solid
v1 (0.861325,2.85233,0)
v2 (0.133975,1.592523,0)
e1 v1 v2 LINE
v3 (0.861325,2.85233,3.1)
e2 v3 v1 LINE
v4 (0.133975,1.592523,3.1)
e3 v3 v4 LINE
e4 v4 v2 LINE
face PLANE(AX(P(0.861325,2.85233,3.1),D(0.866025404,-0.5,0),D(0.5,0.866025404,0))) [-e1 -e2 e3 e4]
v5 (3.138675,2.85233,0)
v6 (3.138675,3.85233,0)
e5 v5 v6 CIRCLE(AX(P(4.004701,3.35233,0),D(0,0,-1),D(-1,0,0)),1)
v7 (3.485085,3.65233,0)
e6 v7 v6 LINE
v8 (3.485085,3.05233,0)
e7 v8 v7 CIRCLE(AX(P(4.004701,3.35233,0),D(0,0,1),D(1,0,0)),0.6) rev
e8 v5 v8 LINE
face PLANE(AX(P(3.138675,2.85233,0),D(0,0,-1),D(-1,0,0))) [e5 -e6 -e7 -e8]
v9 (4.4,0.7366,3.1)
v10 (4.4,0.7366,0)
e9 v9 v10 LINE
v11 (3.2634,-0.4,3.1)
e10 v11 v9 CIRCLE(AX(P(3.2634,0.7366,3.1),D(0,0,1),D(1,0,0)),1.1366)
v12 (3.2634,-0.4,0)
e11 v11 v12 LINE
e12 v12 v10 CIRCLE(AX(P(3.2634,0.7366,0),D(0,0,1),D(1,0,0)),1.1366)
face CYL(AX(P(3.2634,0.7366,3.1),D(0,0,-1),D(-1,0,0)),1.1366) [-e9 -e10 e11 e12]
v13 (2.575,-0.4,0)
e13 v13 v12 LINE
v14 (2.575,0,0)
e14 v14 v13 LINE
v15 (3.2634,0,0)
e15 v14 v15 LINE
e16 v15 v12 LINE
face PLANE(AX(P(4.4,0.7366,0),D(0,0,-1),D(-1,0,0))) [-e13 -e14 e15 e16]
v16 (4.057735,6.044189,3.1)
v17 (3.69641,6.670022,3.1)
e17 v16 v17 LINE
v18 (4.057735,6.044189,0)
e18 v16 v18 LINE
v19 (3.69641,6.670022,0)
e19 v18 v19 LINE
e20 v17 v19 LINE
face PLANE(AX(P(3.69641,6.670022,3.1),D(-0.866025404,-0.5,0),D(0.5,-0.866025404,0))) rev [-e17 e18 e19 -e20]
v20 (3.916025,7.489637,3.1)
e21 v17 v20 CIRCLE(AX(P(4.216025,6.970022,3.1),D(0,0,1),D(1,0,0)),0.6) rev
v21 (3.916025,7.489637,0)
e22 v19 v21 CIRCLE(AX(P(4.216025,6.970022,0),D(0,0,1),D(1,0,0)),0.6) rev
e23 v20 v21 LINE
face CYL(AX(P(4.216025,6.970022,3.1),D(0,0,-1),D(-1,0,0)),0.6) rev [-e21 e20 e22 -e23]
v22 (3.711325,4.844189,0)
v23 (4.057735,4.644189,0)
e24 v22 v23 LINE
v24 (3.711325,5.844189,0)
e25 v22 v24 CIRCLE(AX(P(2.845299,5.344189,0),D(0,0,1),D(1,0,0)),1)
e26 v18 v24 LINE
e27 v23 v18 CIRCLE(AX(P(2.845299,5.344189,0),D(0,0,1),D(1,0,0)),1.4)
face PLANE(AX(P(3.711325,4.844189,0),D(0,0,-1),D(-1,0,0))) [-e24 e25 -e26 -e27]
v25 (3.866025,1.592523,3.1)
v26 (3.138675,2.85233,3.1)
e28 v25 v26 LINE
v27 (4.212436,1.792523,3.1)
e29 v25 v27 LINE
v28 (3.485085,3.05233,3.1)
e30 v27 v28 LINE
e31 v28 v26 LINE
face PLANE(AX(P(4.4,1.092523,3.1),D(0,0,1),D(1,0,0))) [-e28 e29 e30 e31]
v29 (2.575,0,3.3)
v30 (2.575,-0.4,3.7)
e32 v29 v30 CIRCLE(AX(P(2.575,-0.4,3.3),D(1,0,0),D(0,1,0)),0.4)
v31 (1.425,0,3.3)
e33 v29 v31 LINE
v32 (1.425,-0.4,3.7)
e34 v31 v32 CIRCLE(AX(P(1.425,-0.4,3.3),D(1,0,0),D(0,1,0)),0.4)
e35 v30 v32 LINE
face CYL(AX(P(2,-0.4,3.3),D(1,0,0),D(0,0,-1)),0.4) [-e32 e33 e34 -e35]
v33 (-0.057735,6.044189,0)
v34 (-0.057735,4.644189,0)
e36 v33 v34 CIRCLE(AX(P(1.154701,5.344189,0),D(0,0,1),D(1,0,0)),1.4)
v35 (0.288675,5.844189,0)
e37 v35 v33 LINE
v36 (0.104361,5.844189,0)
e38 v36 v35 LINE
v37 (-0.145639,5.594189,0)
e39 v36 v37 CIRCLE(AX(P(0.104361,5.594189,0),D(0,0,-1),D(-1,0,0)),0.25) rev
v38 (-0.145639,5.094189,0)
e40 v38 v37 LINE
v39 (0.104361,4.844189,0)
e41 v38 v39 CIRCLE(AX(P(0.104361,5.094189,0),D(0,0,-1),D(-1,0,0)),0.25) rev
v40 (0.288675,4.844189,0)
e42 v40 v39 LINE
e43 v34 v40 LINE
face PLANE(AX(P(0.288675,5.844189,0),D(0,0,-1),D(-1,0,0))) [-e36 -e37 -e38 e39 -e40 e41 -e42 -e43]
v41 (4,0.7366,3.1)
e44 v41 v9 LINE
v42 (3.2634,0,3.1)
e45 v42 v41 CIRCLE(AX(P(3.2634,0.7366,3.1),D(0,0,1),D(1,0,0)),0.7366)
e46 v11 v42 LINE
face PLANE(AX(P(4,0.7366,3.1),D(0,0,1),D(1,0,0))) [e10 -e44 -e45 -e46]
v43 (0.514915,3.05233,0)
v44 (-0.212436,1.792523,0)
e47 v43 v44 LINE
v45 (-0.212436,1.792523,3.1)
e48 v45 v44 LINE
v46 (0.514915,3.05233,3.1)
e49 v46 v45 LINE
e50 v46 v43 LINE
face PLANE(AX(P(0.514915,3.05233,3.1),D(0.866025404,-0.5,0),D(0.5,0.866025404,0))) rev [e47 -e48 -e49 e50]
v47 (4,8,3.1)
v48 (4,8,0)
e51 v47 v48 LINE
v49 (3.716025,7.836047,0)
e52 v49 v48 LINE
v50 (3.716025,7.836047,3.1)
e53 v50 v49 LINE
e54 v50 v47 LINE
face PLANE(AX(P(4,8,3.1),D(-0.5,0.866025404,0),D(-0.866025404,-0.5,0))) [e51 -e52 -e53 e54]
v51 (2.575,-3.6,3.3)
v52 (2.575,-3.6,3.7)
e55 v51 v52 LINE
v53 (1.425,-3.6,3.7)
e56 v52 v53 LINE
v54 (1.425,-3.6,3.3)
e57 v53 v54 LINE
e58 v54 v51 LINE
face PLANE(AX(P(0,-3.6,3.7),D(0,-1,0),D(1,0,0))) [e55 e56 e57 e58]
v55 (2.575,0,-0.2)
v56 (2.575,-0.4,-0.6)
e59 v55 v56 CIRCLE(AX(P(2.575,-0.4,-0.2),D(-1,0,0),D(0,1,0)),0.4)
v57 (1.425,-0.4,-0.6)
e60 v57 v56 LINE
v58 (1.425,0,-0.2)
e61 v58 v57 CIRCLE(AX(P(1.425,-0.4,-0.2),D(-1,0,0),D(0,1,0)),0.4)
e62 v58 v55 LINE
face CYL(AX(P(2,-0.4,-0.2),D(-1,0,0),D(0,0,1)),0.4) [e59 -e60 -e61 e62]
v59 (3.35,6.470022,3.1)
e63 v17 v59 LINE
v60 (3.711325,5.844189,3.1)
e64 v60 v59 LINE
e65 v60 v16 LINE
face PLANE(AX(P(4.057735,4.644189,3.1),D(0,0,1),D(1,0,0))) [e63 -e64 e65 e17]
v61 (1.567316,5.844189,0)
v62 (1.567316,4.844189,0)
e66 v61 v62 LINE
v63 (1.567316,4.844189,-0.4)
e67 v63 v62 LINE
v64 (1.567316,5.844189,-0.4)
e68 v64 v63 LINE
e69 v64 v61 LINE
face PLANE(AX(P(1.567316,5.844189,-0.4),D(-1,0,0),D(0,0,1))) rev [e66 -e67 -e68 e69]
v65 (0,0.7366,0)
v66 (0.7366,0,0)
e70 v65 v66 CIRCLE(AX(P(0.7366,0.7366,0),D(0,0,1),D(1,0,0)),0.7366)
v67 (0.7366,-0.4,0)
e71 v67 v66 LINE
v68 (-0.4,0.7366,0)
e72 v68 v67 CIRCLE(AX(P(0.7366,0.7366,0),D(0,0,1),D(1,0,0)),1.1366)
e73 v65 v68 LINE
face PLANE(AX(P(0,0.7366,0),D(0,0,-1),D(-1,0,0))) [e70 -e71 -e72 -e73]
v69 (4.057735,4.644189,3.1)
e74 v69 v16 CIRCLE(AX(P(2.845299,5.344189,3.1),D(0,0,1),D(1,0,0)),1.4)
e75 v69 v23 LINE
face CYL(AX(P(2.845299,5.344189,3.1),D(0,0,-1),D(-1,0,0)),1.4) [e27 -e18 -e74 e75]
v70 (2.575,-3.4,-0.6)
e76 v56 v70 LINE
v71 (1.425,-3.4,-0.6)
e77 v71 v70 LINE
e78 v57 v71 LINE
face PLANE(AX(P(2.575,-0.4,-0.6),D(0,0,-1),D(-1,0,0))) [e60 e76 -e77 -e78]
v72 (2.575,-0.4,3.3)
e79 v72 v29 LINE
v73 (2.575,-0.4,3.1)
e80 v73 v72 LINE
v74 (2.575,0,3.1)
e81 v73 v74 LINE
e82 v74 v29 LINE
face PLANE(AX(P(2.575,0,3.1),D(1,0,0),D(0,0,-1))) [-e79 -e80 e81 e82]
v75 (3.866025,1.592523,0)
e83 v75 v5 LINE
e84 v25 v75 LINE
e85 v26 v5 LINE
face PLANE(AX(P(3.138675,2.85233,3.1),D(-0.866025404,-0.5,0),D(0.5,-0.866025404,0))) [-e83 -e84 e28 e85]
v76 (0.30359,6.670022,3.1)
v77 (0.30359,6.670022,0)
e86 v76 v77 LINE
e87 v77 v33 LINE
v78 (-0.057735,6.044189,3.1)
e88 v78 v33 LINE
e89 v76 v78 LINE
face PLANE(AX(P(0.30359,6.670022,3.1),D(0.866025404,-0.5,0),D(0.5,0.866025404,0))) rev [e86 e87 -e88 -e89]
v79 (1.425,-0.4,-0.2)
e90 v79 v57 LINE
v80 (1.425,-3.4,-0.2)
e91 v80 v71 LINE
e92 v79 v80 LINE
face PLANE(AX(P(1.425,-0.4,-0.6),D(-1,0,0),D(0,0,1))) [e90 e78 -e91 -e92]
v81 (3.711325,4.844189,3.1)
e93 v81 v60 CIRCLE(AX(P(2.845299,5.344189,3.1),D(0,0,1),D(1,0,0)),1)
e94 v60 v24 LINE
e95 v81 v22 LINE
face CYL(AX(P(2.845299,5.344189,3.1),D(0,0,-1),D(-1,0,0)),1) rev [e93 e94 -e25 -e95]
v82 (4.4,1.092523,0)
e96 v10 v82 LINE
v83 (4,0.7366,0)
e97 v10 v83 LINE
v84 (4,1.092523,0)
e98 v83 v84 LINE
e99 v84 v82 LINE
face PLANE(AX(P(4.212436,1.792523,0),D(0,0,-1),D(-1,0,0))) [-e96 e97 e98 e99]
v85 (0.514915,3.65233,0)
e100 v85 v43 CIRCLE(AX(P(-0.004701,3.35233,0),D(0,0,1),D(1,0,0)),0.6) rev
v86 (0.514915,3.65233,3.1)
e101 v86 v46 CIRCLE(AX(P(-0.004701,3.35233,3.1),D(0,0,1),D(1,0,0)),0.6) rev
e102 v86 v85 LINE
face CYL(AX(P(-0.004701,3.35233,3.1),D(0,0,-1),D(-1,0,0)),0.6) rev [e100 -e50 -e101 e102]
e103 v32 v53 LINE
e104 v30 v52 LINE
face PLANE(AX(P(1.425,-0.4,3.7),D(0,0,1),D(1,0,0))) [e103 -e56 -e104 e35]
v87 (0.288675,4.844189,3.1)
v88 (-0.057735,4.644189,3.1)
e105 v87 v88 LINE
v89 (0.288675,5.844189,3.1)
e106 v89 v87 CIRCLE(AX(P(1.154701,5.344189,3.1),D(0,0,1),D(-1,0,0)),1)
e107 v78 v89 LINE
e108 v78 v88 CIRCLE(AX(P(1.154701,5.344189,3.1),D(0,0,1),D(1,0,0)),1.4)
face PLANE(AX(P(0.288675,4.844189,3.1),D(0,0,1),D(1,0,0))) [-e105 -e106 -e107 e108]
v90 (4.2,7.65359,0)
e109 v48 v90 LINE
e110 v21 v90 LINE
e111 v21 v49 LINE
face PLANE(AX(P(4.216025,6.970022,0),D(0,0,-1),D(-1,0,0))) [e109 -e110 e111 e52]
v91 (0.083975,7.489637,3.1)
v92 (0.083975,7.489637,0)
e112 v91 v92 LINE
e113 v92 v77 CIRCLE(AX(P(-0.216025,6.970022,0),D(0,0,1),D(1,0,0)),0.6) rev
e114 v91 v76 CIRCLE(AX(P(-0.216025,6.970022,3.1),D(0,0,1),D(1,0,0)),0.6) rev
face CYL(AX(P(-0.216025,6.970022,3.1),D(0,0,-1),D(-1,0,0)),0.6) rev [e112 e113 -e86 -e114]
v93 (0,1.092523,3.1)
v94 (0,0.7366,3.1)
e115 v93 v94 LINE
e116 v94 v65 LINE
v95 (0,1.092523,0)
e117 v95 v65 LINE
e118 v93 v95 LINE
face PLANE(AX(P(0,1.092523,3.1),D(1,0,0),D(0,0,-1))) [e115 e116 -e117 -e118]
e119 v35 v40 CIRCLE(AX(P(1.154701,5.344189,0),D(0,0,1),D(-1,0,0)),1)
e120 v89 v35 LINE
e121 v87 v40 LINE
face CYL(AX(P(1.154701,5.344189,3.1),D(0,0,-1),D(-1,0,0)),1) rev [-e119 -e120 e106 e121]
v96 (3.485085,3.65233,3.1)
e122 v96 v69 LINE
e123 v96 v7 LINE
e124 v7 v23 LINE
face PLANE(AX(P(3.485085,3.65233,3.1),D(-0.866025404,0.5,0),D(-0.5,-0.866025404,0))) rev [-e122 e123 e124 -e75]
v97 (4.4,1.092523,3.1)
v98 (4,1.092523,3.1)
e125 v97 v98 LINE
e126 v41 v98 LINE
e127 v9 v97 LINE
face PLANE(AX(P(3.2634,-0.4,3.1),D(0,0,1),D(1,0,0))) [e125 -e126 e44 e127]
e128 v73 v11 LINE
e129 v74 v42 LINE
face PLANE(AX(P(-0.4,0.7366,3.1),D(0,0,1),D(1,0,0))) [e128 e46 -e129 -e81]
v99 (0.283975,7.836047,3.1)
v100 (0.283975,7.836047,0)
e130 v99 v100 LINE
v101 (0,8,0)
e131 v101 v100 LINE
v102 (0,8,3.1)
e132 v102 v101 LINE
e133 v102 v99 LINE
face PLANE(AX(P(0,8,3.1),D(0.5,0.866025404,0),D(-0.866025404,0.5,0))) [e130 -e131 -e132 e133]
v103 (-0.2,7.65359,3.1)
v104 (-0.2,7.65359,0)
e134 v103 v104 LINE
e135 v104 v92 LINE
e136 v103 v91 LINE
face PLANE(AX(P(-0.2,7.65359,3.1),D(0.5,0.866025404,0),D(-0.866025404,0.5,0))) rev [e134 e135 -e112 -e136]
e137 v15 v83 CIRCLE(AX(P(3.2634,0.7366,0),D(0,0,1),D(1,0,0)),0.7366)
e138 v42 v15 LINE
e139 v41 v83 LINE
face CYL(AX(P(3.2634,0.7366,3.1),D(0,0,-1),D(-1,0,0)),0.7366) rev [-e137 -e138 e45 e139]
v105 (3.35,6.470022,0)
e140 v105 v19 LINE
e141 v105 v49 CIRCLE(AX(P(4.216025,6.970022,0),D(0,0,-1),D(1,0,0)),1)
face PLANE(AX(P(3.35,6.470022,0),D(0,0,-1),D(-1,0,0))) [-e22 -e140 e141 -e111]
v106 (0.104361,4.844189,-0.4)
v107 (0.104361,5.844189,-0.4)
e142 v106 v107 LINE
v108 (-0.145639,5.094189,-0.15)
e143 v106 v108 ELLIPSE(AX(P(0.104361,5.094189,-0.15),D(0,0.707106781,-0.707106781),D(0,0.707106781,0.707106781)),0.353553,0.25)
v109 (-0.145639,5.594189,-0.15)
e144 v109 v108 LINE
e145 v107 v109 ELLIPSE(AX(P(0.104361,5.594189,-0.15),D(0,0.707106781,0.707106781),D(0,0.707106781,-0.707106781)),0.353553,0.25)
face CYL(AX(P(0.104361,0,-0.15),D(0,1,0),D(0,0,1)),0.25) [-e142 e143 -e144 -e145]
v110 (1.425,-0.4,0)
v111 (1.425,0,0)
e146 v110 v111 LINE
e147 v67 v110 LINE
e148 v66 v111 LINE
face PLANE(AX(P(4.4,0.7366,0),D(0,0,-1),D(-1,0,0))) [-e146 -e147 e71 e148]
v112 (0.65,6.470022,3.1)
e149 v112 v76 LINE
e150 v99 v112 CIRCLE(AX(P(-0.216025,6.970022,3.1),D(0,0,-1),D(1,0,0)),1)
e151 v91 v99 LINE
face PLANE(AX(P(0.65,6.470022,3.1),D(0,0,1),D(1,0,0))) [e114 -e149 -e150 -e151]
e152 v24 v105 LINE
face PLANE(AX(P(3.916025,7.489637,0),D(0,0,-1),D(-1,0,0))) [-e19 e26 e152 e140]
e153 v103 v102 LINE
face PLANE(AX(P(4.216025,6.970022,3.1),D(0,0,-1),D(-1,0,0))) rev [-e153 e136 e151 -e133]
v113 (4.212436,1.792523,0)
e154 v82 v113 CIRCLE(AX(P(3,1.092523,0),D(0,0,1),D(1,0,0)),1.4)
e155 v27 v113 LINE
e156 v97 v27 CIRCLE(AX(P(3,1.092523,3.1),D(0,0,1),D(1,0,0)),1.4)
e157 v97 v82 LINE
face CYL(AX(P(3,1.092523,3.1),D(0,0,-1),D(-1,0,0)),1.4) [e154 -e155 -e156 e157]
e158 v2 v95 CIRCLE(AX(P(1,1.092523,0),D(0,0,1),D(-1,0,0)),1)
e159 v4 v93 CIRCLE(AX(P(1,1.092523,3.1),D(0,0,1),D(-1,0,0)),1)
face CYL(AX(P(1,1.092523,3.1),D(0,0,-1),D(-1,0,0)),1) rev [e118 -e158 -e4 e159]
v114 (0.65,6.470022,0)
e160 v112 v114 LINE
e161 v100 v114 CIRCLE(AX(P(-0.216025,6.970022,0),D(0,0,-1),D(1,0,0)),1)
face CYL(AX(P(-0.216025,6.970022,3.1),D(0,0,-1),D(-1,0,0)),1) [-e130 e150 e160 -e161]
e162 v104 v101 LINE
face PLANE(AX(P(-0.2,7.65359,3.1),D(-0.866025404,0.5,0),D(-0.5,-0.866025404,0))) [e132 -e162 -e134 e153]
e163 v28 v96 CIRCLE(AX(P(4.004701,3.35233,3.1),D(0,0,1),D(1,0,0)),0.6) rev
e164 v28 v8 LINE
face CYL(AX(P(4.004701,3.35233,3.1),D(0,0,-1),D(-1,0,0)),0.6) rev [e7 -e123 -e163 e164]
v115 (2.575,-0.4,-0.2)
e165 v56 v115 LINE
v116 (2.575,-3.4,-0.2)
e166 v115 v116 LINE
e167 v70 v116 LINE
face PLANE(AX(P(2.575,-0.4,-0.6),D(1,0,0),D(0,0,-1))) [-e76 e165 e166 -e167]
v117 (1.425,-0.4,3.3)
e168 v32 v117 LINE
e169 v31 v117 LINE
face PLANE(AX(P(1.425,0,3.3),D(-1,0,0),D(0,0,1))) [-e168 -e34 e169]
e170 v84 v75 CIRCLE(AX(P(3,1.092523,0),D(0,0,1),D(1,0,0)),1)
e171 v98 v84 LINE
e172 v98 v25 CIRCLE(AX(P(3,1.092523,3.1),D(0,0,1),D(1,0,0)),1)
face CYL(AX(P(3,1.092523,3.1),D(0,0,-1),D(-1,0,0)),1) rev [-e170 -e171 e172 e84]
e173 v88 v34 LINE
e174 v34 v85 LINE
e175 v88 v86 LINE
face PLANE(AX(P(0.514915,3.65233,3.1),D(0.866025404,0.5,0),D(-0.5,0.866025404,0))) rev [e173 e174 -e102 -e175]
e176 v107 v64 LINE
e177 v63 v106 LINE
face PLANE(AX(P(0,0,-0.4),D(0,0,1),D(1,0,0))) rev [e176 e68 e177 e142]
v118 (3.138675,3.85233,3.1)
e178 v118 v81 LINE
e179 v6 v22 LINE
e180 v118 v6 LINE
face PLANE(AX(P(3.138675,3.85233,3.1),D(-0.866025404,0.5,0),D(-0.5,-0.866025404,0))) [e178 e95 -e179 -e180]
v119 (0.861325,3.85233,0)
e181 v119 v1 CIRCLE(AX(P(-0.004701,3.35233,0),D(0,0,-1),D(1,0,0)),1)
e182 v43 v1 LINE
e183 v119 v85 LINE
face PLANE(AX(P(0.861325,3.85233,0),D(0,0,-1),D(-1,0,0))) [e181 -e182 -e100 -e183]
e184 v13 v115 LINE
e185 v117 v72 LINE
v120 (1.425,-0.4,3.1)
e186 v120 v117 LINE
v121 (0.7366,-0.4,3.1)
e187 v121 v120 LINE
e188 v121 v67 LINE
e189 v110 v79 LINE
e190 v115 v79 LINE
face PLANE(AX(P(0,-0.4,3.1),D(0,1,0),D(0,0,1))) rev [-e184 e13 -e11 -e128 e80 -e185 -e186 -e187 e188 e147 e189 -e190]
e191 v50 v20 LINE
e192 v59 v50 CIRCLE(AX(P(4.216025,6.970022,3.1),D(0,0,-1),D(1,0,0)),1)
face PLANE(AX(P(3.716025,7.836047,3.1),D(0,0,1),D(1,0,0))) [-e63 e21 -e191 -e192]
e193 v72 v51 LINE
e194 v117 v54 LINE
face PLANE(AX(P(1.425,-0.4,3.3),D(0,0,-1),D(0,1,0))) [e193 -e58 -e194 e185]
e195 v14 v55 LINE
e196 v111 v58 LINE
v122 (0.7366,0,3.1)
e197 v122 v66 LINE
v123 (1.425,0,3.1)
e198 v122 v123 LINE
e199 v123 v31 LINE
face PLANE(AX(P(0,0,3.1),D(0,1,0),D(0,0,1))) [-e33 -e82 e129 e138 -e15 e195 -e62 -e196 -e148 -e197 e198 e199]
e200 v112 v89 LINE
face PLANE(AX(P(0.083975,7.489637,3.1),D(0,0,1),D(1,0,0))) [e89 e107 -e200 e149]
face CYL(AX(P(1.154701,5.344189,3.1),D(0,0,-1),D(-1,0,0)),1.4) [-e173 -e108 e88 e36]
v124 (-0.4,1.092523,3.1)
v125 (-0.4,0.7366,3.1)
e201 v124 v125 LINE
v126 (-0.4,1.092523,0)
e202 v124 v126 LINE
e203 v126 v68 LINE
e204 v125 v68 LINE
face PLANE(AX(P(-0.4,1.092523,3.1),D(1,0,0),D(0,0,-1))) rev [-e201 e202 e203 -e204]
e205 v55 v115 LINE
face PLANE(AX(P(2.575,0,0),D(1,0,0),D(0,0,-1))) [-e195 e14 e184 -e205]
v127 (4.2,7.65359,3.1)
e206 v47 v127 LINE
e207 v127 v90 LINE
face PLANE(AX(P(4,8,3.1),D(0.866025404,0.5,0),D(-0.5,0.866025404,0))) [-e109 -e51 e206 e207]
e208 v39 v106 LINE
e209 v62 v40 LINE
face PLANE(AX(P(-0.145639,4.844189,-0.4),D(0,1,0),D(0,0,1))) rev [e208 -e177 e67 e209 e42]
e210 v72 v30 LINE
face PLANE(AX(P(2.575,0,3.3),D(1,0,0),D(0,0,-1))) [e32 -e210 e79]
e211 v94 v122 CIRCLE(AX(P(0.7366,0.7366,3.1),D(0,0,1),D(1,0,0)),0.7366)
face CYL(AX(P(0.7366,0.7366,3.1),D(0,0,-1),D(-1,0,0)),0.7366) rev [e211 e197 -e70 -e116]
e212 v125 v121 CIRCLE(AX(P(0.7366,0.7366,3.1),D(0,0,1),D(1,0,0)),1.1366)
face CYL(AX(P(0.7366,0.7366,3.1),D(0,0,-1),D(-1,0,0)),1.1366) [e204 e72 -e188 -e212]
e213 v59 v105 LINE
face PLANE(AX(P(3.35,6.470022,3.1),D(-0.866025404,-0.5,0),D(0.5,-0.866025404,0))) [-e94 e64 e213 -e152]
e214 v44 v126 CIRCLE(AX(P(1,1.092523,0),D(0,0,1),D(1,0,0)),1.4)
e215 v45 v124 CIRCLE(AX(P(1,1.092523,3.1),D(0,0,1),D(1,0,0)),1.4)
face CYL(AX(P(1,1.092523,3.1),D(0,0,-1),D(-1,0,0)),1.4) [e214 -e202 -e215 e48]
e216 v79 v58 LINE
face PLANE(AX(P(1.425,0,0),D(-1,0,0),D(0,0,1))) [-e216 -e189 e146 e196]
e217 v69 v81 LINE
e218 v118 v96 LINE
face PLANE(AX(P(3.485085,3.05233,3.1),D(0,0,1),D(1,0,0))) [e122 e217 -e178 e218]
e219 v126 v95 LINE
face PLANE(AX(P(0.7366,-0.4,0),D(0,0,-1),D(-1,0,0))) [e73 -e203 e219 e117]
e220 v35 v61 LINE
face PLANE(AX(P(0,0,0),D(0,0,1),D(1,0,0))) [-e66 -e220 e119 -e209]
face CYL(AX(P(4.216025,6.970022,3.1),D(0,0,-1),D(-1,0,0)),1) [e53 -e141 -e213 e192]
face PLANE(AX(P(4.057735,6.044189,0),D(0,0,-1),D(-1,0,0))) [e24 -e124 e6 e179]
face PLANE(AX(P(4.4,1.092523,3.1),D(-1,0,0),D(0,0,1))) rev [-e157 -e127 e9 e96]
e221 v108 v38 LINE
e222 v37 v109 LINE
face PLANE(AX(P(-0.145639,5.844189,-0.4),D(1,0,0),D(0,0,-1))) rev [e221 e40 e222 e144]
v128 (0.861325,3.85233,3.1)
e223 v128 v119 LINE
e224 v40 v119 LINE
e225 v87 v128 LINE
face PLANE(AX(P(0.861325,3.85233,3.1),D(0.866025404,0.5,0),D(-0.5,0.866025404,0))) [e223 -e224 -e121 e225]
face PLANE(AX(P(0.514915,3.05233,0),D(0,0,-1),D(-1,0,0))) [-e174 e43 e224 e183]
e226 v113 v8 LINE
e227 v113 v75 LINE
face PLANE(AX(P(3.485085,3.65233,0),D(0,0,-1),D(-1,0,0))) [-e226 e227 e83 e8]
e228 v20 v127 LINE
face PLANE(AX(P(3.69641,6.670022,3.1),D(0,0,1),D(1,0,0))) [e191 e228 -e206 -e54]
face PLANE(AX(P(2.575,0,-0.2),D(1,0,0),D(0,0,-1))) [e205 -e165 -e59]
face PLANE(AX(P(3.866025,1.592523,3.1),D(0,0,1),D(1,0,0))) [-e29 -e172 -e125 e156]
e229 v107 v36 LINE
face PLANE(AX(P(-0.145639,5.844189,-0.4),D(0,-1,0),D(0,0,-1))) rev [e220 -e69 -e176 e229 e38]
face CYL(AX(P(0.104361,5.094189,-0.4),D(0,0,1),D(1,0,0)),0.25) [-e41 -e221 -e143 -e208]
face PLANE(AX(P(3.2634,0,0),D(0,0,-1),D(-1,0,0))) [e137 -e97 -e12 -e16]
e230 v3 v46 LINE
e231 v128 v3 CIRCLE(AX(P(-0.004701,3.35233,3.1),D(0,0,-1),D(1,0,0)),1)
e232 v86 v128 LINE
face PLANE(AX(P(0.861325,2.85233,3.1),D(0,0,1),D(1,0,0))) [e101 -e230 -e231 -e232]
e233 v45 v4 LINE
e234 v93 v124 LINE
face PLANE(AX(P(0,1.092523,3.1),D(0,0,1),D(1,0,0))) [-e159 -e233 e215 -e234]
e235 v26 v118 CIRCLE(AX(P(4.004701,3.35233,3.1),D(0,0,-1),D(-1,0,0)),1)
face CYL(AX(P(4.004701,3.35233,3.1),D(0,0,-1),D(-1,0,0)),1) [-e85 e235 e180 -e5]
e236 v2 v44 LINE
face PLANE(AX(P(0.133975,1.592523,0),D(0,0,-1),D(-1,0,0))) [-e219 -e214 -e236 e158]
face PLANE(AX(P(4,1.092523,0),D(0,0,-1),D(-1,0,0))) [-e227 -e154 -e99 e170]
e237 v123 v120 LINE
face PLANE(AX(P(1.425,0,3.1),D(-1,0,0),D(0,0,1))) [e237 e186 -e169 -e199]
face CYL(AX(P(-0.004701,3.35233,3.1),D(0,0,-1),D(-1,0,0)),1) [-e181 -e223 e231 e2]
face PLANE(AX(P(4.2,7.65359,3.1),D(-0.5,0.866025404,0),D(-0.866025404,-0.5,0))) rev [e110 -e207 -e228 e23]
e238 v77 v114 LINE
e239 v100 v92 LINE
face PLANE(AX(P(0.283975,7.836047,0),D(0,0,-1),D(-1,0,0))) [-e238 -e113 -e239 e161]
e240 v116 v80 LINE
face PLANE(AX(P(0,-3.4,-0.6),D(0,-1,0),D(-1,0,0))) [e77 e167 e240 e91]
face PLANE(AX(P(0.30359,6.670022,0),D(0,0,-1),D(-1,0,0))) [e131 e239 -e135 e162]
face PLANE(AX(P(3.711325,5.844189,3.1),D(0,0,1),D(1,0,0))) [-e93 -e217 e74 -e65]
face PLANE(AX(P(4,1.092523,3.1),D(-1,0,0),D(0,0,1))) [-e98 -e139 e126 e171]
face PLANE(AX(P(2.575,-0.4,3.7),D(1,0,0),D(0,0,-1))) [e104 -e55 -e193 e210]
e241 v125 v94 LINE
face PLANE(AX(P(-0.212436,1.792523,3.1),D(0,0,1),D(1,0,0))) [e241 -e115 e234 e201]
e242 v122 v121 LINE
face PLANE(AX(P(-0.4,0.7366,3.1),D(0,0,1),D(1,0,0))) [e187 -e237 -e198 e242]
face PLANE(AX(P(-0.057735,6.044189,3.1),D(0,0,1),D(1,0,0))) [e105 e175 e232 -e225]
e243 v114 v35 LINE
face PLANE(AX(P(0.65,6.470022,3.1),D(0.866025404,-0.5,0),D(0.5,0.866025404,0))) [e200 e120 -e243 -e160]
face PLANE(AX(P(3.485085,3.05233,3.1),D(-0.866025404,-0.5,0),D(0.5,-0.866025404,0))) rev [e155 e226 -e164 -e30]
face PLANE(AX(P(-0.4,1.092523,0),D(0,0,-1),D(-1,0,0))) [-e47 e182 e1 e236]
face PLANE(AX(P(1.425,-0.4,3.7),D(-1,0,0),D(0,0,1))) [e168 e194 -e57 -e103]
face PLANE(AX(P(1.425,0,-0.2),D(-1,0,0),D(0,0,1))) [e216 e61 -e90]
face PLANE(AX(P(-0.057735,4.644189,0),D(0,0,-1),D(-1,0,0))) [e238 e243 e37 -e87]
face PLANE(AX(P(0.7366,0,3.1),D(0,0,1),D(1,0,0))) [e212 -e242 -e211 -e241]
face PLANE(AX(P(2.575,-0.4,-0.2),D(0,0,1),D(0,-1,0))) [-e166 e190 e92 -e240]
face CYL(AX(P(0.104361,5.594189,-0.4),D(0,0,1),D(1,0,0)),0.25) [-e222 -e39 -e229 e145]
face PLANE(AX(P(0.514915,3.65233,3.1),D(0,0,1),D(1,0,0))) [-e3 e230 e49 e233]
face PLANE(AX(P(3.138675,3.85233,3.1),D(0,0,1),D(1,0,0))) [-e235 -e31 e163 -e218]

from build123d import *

# Parameters (mm, degrees)
SM_BASE_FLANGE_1_DEPTH = 3.1
SKETCH_11_W            = 1.15
SKETCH_11_H            = 0.4
SKETCH_13_W            = 1.15
SKETCH_13_H            = 0.4
SKETCH_15_W            = 1.712954878
SKETCH_15_H            = 1
EXTRUDE_1_DEPTH        = 0.4
FILLET_1_R             = 0.25


# Sheet-metal steps are written as plain solids
with BuildPart() as part:
    # Sketch 1 → 基体-法兰1 (new body)
    with BuildSketch(Plane.XY):
        with BuildLine():
            Line((0, 8), (0.283974596, 7.83604719))
            ThreePointArc((0.283974596, 7.83604719), (0.749900423, 7.228840832), (0.65, 6.470021787))
            Line((0.65, 6.470021787), (0.288675135, 5.844188762))
            ThreePointArc((0.288675135, 5.844188762), (0.154700538, 5.344188762), (0.288675135, 4.844188762))
            Line((0.288675135, 4.844188762), (0.861324865, 3.852330333))
            ThreePointArc((0.861324865, 3.852330333), (0.995299462, 3.352330333), (0.861324865, 2.852330333))
            Line((0.861324865, 2.852330333), (0.133974596, 1.592522712))
            ThreePointArc((0.133974596, 1.592522712), (0.034074174, 1.351341757), (0, 1.092522712))
            Line((0, 1.092522712), (0, 0.7366))
            ThreePointArc((0, 0.7366), (0.215745145, 0.215745145), (0.7366, 0))
            Line((0.7366, 0), (3.2634, 0))
            ThreePointArc((3.2634, 0), (3.784254855, 0.215745145), (4, 0.7366))
            Line((4, 0.7366), (4, 1.092522712))
            ThreePointArc((4, 1.092522712), (3.965925826, 1.351341757), (3.866025404, 1.592522712))
            Line((3.866025404, 1.592522712), (3.138675135, 2.852330333))
            ThreePointArc((3.138675135, 2.852330333), (3.004700538, 3.352330333), (3.138675135, 3.852330333))
            Line((3.138675135, 3.852330333), (3.711324865, 4.844188762))
            ThreePointArc((3.711324865, 4.844188762), (3.845299462, 5.344188762), (3.711324865, 5.844188762))
            Line((3.711324865, 5.844188762), (3.35, 6.470021787))
            ThreePointArc((3.35, 6.470021787), (3.250099577, 7.228840832), (3.716025404, 7.83604719))
            Line((3.716025404, 7.83604719), (4, 8))
            Line((4, 8), (4.2, 7.653589838))
            Line((4.2, 7.653589838), (3.916025404, 7.489637029))
            ThreePointArc((3.916025404, 7.489637029), (3.636469908, 7.125313214), (3.696410162, 6.670021787))
            Line((3.696410162, 6.670021787), (4.057735027, 6.044188762))
            ThreePointArc((4.057735027, 6.044188762), (4.245299462, 5.344188762), (4.057735027, 4.644188762))
            Line((4.057735027, 4.644188762), (3.485085296, 3.652330333))
            ThreePointArc((3.485085296, 3.652330333), (3.404700538, 3.352330333), (3.485085296, 3.052330333))
            Line((3.485085296, 3.052330333), (4.212435565, 1.792522712))
            ThreePointArc((4.212435565, 1.792522712), (4.352296157, 1.454869375), (4.4, 1.092522712))
            Line((4.4, 1.092522712), (4.4, 0.7366))
            ThreePointArc((4.4, 0.7366), (4.067097567, -0.067097567), (3.2634, -0.4))
            Line((3.2634, -0.4), (0.7366, -0.4))
            ThreePointArc((0.7366, -0.4), (-0.067097567, -0.067097567), (-0.4, 0.7366))
            Line((-0.4, 0.7366), (-0.4, 1.092522712))
            ThreePointArc((-0.4, 1.092522712), (-0.352296157, 1.454869375), (-0.212435565, 1.792522712))
            Line((-0.212435565, 1.792522712), (0.514914704, 3.052330333))
            ThreePointArc((0.514914704, 3.052330333), (0.595299462, 3.352330333), (0.514914704, 3.652330333))
            Line((0.514914704, 3.652330333), (-0.057735027, 4.644188762))
            ThreePointArc((-0.057735027, 4.644188762), (-0.245299462, 5.344188762), (-0.057735027, 6.044188762))
            Line((-0.057735027, 6.044188762), (0.303589838, 6.670021787))
            ThreePointArc((0.303589838, 6.670021787), (0.363530092, 7.125313214), (0.083974596, 7.489637029))
            Line((0.083974596, 7.489637029), (-0.2, 7.653589838))
            Line((-0.2, 7.653589838), (0, 8))
        make_face()
    extrude(amount=SM_BASE_FLANGE_1_DEPTH)

    # 扫描1: sweep along a path in 草图12
    with BuildLine(Plane(origin=(2, 0, 0), x_dir=(0, 0, -1), z_dir=(1, 0, 0))) as sweep_1_path:
        Line((-3.5, -3.6), (-3.5, -0.4))
        ThreePointArc((-3.5, -0.4), (-3.441421356, -0.258578644), (-3.3, -0.2))
        Line((-3.3, -0.2), (-3.1, -0.2))
    # 草图11 → 扫描1 (sweep)
    with BuildSketch(Plane.XY.offset(3.1)):
        with Locations((2, -0.2)):
            Rectangle(SKETCH_11_W, SKETCH_11_H)
    sweep(path=sweep_1_path.line)

    # 扫描2: sweep along a path in 草图14
    with BuildLine(Plane(origin=(2, 0, 0), x_dir=(0, 0, -1), z_dir=(1, 0, 0))) as sweep_2_path:
        Line((0, -0.2), (0.2, -0.2))
        ThreePointArc((0.2, -0.2), (0.341421356, -0.258578644), (0.4, -0.4))
        Line((0.4, -0.4), (0.4, -3.4))
    # 草图13 → 扫描2 (sweep)
    with BuildSketch(Plane(origin=(0, 0, 0), x_dir=(-1, 0, 0), z_dir=(0, 0, -1))):
        with Locations((-2, -0.2)):
            Rectangle(SKETCH_13_W, SKETCH_13_H)
    sweep(path=sweep_2_path.line)

    # 草图15 → 凸台-拉伸1 (add)
    with BuildSketch(Plane(origin=(0, 0, 0), x_dir=(-1, 0, 0), z_dir=(0, 0, -1))):
        with Locations((-0.710838396, 5.344188762)):
            Rectangle(SKETCH_15_W, SKETCH_15_H)
    extrude(amount=EXTRUDE_1_DEPTH)

    # 圆角1
    fillet_1_edges = [part.edges().sort_by_distance(p)[0] for p in [
        (-0.145639043, 4.844188762, -0.2),
        (-0.145639043, 5.844188762, -0.2),
        (-0.145639043, 5.344188762, -0.4),
    ]]
    fillet(fillet_1_edges, radius=FILLET_1_R)


solid = part.part
